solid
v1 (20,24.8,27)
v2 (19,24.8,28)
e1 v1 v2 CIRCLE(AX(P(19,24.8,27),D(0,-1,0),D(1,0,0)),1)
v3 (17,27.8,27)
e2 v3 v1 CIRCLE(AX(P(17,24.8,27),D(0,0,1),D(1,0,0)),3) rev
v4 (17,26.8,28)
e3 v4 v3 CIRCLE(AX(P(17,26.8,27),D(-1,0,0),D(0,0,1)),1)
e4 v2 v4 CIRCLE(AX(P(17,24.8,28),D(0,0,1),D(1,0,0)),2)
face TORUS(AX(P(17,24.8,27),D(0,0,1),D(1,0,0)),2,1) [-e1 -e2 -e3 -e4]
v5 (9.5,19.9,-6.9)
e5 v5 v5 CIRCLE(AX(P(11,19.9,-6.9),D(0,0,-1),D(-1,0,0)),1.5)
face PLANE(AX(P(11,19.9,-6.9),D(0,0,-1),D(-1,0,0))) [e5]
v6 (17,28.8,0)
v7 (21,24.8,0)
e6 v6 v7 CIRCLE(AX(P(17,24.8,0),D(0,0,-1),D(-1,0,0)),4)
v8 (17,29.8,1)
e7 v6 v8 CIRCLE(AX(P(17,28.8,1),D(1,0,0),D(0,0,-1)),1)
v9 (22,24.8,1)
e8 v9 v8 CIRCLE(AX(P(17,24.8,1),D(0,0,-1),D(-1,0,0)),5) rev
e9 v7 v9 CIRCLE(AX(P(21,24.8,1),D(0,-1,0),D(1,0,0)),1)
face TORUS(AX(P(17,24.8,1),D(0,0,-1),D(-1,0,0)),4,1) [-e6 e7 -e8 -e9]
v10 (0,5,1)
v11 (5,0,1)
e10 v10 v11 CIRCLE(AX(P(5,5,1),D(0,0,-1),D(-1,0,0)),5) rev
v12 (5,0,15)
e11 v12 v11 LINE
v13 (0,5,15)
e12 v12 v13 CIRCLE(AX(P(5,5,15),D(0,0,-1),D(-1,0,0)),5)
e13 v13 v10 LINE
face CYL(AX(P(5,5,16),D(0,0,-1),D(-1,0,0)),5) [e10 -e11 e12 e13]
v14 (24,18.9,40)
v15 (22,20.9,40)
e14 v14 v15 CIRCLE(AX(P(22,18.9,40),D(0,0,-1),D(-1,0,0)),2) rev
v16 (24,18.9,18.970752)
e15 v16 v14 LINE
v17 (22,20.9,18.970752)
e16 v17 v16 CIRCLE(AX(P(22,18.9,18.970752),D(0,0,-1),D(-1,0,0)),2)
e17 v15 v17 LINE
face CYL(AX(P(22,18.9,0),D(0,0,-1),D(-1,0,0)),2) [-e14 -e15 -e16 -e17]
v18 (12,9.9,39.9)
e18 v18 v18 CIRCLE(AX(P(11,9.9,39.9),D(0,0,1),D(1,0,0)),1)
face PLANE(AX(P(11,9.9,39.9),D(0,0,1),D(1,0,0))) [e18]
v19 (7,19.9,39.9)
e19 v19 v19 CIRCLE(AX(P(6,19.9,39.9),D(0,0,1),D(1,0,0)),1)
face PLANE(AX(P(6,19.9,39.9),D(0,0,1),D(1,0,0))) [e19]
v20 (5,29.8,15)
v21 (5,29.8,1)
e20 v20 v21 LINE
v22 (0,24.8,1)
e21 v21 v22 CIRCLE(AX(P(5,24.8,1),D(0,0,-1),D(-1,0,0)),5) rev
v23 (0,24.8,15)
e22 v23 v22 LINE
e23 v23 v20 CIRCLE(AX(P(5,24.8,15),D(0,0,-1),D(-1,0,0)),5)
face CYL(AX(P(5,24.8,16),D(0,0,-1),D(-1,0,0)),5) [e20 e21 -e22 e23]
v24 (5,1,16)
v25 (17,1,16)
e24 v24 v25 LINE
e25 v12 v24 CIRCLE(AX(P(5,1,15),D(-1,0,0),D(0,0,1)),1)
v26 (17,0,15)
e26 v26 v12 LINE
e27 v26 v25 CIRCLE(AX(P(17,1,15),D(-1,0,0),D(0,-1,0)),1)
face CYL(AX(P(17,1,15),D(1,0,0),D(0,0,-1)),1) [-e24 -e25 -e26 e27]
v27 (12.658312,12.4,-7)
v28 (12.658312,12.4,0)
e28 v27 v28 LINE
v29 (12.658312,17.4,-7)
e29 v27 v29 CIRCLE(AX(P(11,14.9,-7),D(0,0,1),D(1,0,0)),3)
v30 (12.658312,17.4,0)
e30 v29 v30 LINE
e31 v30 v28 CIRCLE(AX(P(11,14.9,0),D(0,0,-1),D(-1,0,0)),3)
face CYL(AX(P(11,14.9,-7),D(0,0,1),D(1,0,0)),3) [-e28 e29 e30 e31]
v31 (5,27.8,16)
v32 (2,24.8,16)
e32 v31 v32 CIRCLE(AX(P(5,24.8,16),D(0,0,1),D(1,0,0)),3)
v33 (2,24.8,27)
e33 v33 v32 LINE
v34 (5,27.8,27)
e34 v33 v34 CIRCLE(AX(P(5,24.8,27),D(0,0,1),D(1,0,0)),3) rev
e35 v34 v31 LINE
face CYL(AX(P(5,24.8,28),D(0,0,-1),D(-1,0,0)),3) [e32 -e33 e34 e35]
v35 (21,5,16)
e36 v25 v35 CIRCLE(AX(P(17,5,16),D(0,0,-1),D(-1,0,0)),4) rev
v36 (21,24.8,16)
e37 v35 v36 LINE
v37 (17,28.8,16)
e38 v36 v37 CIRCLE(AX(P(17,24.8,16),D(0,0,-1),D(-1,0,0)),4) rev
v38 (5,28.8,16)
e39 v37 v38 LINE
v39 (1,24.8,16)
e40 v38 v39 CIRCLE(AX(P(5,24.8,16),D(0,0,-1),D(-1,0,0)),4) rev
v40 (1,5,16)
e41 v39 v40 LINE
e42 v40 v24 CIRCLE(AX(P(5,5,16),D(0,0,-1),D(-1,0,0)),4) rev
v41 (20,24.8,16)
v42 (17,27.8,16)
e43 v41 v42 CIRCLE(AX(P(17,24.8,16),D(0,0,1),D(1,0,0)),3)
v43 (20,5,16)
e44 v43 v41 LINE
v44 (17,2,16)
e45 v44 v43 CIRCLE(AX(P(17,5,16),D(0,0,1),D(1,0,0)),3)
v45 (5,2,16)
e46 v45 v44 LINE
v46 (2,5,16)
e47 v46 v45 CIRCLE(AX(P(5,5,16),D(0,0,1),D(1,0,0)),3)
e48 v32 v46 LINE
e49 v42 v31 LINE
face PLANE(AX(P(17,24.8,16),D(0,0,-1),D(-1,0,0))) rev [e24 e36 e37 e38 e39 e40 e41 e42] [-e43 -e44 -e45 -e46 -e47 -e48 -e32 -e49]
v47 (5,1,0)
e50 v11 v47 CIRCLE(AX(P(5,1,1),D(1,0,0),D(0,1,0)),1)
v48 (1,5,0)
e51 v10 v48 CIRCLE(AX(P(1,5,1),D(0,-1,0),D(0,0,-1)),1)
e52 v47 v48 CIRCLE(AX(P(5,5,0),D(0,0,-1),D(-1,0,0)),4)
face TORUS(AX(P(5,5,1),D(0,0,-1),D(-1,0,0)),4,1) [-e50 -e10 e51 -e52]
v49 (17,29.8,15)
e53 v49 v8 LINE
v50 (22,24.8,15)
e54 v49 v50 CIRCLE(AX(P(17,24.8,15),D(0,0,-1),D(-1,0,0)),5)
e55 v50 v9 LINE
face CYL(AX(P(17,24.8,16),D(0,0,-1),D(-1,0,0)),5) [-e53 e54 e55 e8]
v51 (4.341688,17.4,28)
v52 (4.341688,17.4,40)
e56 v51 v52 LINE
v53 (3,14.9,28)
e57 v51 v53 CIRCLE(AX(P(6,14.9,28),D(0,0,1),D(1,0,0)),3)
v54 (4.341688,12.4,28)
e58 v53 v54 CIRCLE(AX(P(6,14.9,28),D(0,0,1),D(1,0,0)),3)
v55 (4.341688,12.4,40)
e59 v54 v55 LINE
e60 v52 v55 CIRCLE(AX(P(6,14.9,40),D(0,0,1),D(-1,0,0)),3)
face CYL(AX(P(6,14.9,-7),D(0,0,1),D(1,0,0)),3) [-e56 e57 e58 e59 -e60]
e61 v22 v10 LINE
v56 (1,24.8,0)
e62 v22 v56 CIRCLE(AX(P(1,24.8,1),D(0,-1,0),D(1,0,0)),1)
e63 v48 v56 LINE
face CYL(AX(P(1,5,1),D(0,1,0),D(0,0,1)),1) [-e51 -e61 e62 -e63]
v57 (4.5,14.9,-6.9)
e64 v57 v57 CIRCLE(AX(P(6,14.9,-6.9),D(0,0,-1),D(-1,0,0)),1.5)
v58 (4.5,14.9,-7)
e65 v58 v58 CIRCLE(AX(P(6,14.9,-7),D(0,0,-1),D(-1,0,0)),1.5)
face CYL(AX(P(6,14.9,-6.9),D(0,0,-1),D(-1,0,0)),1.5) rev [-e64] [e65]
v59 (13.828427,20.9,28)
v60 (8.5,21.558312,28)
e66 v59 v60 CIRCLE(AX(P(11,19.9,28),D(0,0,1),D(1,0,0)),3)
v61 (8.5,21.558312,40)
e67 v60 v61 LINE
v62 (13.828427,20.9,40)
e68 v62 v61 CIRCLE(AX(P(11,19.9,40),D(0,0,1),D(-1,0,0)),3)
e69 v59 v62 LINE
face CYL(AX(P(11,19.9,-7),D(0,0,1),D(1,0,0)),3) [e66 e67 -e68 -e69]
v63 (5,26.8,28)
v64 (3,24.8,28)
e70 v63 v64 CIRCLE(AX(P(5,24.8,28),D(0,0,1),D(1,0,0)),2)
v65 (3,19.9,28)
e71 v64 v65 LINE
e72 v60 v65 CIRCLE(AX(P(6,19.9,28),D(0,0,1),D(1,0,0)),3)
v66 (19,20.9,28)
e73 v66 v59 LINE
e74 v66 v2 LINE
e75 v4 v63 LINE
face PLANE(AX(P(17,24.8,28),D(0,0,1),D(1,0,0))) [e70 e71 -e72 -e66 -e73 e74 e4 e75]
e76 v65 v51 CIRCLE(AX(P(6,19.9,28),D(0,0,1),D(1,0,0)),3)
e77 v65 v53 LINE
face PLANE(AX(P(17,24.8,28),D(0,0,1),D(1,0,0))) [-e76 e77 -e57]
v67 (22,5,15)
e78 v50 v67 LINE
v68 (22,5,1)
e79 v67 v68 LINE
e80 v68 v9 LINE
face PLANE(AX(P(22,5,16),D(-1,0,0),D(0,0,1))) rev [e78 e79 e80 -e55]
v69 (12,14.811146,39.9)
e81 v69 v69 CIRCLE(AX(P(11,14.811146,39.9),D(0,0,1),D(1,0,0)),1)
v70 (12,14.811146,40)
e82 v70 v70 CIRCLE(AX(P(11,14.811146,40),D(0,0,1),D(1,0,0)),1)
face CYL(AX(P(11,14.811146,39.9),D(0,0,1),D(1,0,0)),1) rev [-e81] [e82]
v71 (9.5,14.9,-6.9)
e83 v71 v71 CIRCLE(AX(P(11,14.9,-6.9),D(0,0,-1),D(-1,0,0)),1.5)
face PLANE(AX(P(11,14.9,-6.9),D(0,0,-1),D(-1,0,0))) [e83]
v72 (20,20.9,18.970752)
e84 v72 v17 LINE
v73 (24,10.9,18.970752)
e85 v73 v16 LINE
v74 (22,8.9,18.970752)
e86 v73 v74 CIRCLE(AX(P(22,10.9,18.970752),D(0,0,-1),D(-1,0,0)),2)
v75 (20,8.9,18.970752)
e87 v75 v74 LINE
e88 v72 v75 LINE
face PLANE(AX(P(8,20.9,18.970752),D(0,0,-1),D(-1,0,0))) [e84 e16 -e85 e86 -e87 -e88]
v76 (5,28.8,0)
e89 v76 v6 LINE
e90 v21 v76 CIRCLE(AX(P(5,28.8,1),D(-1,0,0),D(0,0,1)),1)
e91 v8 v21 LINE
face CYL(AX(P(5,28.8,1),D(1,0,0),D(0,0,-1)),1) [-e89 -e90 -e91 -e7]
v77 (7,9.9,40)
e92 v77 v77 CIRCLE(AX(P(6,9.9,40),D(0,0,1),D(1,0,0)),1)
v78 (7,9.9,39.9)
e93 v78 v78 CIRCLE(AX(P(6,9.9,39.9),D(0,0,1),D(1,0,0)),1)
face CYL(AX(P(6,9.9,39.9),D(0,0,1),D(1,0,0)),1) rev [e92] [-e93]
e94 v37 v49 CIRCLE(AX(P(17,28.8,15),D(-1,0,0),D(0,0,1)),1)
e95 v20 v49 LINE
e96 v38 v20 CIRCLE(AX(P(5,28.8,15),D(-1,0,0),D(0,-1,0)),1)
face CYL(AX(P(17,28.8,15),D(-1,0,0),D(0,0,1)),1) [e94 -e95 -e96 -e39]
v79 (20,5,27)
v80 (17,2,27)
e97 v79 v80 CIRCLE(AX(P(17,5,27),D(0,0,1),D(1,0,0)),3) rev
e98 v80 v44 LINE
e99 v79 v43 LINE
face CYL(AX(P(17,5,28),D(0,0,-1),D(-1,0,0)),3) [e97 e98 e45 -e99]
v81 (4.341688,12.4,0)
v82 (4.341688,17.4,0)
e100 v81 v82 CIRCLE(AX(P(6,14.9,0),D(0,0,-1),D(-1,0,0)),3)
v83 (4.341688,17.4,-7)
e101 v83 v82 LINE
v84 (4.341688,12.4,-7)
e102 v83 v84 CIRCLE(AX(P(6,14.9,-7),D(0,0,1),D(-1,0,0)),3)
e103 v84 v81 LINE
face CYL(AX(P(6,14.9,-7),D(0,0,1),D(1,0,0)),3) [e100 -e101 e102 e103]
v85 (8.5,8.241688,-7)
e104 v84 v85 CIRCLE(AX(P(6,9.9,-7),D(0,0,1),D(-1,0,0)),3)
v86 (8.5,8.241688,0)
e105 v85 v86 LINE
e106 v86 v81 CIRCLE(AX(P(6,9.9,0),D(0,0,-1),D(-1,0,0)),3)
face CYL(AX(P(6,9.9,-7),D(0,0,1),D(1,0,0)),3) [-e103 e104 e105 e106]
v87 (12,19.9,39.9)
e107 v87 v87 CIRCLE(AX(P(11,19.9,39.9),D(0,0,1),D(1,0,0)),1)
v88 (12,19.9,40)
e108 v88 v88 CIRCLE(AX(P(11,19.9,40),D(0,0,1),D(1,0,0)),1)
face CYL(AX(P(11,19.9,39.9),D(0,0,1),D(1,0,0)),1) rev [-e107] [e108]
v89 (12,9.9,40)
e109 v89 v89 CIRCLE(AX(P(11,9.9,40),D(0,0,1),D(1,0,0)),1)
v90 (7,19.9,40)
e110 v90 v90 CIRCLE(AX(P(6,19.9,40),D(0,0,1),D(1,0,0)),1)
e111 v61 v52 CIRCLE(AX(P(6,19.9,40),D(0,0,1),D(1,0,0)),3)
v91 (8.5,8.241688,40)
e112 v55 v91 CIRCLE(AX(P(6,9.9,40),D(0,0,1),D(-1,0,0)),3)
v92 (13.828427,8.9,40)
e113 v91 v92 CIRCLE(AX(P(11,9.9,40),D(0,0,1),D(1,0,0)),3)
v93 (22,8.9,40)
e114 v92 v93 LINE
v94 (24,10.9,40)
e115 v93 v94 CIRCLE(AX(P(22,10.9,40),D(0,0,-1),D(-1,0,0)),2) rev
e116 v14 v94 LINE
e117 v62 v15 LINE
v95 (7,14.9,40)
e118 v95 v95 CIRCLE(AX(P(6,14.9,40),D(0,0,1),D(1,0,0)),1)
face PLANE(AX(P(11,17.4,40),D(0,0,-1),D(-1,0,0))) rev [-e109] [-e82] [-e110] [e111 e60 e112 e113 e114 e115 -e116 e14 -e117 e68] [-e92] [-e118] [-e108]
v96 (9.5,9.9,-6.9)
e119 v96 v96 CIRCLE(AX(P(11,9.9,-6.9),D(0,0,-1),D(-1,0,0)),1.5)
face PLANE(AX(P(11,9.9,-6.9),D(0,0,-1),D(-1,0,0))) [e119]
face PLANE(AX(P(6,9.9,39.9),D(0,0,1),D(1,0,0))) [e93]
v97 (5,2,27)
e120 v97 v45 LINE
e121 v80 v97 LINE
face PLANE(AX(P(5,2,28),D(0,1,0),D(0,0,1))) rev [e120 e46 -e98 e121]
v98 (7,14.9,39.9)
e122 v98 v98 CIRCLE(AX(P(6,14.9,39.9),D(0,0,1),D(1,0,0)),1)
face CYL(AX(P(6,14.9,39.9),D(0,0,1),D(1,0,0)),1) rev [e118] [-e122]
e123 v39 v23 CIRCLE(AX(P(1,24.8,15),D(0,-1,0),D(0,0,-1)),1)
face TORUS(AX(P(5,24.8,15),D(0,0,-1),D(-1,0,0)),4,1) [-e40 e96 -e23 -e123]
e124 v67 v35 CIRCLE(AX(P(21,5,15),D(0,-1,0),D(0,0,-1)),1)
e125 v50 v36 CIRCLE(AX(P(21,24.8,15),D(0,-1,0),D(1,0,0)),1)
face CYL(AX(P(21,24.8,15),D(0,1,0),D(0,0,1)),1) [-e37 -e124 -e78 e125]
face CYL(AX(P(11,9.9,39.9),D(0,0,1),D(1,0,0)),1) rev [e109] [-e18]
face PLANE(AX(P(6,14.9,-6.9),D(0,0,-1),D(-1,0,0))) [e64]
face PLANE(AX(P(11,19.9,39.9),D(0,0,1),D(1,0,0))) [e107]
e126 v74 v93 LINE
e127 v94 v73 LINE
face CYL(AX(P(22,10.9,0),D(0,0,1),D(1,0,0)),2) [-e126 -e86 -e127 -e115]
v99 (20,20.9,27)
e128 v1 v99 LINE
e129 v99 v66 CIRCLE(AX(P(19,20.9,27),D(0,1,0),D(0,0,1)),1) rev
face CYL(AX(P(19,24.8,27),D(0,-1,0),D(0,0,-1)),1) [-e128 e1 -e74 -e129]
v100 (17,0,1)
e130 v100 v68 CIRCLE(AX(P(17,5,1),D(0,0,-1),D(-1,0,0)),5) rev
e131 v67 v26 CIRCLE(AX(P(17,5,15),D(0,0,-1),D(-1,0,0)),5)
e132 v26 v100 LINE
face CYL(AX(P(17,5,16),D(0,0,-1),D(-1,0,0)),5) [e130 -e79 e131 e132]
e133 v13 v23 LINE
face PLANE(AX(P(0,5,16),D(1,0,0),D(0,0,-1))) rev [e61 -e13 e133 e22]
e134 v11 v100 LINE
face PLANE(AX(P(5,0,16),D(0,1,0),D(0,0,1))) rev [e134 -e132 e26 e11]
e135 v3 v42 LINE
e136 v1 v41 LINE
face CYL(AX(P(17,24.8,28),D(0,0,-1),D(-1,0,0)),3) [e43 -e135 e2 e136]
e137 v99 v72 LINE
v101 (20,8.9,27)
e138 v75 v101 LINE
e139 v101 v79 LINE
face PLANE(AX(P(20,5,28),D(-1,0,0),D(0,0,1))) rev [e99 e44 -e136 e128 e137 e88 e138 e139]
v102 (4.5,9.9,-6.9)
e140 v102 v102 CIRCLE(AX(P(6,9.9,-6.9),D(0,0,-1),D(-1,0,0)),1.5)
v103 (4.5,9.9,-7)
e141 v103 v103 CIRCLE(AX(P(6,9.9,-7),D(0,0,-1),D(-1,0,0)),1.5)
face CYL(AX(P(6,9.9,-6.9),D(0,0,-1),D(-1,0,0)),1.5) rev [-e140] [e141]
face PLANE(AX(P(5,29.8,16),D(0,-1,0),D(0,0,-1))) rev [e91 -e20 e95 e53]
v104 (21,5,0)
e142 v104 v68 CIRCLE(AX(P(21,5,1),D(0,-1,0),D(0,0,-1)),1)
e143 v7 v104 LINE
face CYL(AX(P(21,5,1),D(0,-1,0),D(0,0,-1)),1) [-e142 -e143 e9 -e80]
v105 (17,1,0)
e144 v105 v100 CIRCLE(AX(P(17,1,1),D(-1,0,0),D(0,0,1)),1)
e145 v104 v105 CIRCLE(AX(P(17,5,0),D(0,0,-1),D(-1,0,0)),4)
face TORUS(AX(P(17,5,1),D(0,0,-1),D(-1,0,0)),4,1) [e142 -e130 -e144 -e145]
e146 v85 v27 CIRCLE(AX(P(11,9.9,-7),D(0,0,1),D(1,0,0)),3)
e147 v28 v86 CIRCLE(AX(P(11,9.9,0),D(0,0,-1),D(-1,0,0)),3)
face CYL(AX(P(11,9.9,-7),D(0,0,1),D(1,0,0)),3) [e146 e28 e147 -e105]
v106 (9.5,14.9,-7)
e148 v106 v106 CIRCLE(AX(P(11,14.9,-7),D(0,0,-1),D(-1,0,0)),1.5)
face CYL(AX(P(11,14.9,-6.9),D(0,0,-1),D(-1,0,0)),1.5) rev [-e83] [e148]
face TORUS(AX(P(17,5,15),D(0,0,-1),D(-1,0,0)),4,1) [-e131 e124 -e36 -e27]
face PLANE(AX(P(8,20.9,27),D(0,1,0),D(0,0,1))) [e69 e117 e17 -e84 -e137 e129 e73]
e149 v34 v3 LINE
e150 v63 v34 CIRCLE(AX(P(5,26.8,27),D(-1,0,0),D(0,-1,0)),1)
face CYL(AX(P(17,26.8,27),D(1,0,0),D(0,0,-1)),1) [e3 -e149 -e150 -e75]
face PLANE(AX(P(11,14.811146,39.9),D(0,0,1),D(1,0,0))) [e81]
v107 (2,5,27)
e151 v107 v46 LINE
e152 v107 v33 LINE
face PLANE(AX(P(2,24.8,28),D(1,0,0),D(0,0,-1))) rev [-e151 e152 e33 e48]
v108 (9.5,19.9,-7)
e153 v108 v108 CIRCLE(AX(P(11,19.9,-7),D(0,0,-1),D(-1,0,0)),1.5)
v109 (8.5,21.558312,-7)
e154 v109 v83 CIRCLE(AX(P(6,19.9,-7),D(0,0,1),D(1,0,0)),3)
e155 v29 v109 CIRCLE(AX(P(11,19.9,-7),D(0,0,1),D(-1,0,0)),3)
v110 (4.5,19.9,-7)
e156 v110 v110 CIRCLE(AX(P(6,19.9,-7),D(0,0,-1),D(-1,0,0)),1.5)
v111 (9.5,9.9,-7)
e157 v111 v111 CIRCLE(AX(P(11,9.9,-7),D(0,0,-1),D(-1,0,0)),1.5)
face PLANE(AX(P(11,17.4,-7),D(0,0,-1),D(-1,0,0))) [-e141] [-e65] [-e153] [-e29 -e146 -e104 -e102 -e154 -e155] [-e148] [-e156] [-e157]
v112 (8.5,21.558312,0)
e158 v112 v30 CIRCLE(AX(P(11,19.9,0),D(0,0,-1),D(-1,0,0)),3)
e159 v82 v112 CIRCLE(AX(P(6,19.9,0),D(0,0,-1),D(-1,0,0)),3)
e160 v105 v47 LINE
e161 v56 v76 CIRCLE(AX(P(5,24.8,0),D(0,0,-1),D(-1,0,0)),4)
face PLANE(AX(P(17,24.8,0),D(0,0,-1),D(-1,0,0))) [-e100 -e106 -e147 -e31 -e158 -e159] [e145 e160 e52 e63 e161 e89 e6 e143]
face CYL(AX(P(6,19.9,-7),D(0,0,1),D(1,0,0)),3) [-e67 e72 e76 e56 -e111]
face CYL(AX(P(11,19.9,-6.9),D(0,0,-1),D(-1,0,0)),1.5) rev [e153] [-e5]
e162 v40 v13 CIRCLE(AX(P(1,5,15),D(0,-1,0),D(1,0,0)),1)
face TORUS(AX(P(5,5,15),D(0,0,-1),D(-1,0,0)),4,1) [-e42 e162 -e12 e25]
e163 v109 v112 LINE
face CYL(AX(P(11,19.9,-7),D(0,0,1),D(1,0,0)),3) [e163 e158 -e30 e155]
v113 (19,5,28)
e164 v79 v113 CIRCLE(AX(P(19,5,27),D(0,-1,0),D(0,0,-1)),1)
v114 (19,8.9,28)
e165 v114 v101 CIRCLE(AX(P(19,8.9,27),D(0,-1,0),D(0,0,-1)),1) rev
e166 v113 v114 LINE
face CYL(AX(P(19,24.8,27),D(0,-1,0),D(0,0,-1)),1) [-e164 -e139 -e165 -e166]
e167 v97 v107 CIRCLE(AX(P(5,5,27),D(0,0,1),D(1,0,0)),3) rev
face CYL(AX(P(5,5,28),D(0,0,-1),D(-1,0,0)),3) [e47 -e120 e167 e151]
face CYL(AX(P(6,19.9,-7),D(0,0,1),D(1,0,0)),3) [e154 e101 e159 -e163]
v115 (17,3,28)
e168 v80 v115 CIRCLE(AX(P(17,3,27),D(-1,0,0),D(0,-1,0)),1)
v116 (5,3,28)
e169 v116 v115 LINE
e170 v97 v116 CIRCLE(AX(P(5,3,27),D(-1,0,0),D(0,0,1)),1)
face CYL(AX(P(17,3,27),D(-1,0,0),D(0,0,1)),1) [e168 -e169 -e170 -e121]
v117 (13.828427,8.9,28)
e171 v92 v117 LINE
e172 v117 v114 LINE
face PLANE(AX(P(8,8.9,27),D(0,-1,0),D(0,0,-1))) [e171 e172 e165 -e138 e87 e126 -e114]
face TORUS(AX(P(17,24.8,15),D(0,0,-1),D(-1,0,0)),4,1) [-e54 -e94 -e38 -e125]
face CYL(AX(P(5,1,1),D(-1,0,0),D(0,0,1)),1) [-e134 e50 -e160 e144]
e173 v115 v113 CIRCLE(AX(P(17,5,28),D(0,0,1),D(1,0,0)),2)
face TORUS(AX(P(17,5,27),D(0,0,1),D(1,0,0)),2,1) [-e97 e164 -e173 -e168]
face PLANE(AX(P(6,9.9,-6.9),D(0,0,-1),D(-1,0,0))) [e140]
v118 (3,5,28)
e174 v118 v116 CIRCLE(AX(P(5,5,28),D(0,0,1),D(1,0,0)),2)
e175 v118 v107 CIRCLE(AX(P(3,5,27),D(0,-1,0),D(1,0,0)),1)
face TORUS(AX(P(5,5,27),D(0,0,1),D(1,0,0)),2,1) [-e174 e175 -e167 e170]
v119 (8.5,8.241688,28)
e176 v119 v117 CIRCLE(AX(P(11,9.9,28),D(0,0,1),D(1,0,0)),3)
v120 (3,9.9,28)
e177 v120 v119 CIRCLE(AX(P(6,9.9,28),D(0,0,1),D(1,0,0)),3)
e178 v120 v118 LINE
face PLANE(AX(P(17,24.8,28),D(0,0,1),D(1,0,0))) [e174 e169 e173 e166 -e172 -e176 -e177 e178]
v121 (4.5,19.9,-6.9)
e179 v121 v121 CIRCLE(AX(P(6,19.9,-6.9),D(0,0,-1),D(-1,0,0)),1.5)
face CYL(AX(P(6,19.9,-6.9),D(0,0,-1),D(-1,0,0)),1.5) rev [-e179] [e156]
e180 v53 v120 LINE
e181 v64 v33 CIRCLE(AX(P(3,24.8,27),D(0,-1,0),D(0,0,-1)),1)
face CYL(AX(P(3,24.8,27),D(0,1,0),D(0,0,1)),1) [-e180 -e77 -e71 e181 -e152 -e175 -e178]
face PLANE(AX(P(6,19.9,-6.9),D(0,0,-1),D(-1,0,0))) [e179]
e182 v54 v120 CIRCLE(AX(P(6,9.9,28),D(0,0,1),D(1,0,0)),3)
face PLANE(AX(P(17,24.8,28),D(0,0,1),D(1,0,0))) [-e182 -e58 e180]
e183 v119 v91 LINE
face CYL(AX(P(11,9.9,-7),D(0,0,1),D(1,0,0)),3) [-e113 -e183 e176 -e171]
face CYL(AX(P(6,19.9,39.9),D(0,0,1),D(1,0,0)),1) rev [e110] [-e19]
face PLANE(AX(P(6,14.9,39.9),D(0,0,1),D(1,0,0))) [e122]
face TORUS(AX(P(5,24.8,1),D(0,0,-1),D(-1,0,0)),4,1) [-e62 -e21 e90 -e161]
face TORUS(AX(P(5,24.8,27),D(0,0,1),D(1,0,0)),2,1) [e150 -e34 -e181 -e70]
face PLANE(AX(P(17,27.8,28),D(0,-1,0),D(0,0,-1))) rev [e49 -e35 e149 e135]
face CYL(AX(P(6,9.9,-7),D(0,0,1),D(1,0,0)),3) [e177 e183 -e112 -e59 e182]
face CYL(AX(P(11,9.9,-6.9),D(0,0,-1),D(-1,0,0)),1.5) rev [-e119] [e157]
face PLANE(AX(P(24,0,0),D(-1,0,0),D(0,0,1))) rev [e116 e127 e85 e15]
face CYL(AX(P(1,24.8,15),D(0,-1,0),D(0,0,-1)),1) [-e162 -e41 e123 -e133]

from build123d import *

# Parameters (mm, degrees)
EXTRUDE_1_DEPTH      = 16
EXTRUDE_2_DEPTH      = 12
EXTRUDE_3_DEPTH      = 12
EXTRUDE_3_DEPTH_BACK = 35
FILLET_1_R           = 1
EXTRUDE_4_DEPTH      = 4
EXTRUDE_4_DEPTH_BACK = 12
FILLET_2_R           = 2
SKETCH_5_R           = 1.5
CUT_EXTRUDE_1_DEPTH  = 0.1
SKETCH_6_R           = 1
CUT_EXTRUDE_2_DEPTH  = 0.1


with BuildPart() as part:
    # ｽｹｯﾁ1 → ﾎﾞｽ - 押し出し1 (new body)
    with BuildSketch(Plane.XY):
        with BuildLine():
            Line((5, 0), (17, 0))
            ThreePointArc((17, 0), (20.535533906, 1.464466094), (22, 5))
            Line((22, 5), (22, 24.8))
            ThreePointArc((22, 24.8), (20.535533906, 28.335533906), (17, 29.8))
            Line((17, 29.8), (5, 29.8))
            ThreePointArc((5, 29.8), (1.464466094, 28.335533906), (0, 24.8))
            Line((0, 24.8), (0, 5))
            ThreePointArc((0, 5), (1.464466094, 1.464466094), (5, 0))
        make_face()
    extrude(amount=EXTRUDE_1_DEPTH)

    # ｽｹｯﾁ2 → ﾎﾞｽ - 押し出し2 (add)
    with BuildSketch(Plane.XY.offset(16)):
        with BuildLine():
            Line((17, 27.8), (5, 27.8))
            ThreePointArc((5, 27.8), (2.878679656, 26.921320344), (2, 24.8))
            Line((2, 24.8), (2, 5))
            ThreePointArc((2, 5), (2.878679656, 2.878679656), (5, 2))
            Line((5, 2), (17, 2))
            ThreePointArc((17, 2), (19.121320344, 2.878679656), (20, 5))
            Line((20, 5), (20, 24.8))
            ThreePointArc((20, 24.8), (19.121320344, 26.921320344), (17, 27.8))
        make_face()
    extrude(amount=EXTRUDE_2_DEPTH)

    # ｽｹｯﾁ3 → ﾎﾞｽ - 押し出し3 (add, two sides: drawn at the far end of the back side and taken through both)
    with BuildSketch(Plane.XY.offset(28).offset(-EXTRUDE_3_DEPTH_BACK)):
        with BuildLine():
            ThreePointArc((4.341687605, 12.4), (3, 14.9), (4.341687605, 17.4))
            ThreePointArc((4.341687605, 17.4), (3.878679656, 22.021320344), (8.5, 21.558312395))
            ThreePointArc((8.5, 21.558312395), (13.121320344, 22.021320344), (12.658312395, 17.4))
            ThreePointArc((12.658312395, 17.4), (14, 14.9), (12.658312395, 12.4))
            ThreePointArc((12.658312395, 12.4), (13.121320344, 7.778679656), (8.5, 8.241687605))
            ThreePointArc((8.5, 8.241687605), (3.878679656, 7.778679656), (4.341687605, 12.4))
        make_face()
    extrude(amount=EXTRUDE_3_DEPTH + EXTRUDE_3_DEPTH_BACK)

    # ﾌｨﾚｯﾄ1
    fillet_1_edges = [part.edges().sort_by_distance(p)[0] for p in [
        (1.464466094, 28.335533906, 16),
        (11, 29.8, 0),
        (20.535533906, 28.335533906, 0),
        (0, 14.9, 16),
        (1.464466094, 1.464466094, 16),
        (11, 0, 16),
        (20.535533906, 1.464466094, 16),
        (22, 14.9, 16),
        (19.121320344, 26.921320344, 28),
        (11, 27.8, 28),
        (2.878679656, 26.921320344, 28),
        (2, 14.9, 28),
        (2.878679656, 2.878679656, 28),
        (11, 2, 28),
        (19.121320344, 2.878679656, 28),
        (20, 14.9, 28),
        (20.535533906, 28.335533906, 16),
        (11, 29.8, 16),
        (22, 14.9, 0),
        (20.535533906, 1.464466094, 0),
        (11, 0, 0),
        (1.464466094, 1.464466094, 0),
        (0, 14.9, 0),
        (1.464466094, 28.335533906, 0),
    ]]
    fillet(fillet_1_edges, radius=FILLET_1_R - 0.0001)  # a hair under: the kernel refuses the full size

    # ｽｹｯﾁ4 → ﾎﾞｽ - 押し出し4 (add, two sides: drawn at the far end of the back side and taken through both)
    with BuildSketch(Plane(origin=(20, 0, 0), x_dir=(0, 0, -1), z_dir=(1, 0, 0)).offset(-EXTRUDE_4_DEPTH_BACK)):
        Polygon((-27, 20.9), (-40, 20.9), (-40, 8.9), (-27, 8.9), (-18.970751541, 8.9), (-18.970751541, 20.9), align=None)
    extrude(amount=EXTRUDE_4_DEPTH + EXTRUDE_4_DEPTH_BACK)

    # ﾌｨﾚｯﾄ2
    fillet_2_edges = [part.edges().sort_by_distance(p)[0] for p in [
        (24, 8.9, 29.48537577),
        (24, 20.9, 29.48537577),
    ]]
    fillet(fillet_2_edges, radius=FILLET_2_R)

    # ｽｹｯﾁ5 → ｶｯﾄ - 押し出し1 (cut)
    with BuildSketch(Plane(origin=(0, 0, -7), x_dir=(-1, 0, 0), z_dir=(0, 0, -1))):
        with Locations((-11, 19.9)):
            Circle(SKETCH_5_R)
        with Locations((-11, 14.9)):
            Circle(SKETCH_5_R)
        with Locations((-11, 9.9)):
            Circle(SKETCH_5_R)
        with Locations((-6, 19.9)):
            Circle(SKETCH_5_R)
        with Locations((-6, 14.9)):
            Circle(SKETCH_5_R)
        with Locations((-6, 9.9)):
            Circle(SKETCH_5_R)
    extrude(amount=-CUT_EXTRUDE_1_DEPTH, mode=Mode.SUBTRACT)

    # ｽｹｯﾁ6 → ｶｯﾄ - 押し出し2 (cut)
    with BuildSketch(Plane.XY.offset(40)):
        with Locations((11, 19.9)):
            Circle(SKETCH_6_R)
        with Locations((11, 14.811145862)):
            Circle(SKETCH_6_R)
        with Locations((11, 9.9)):
            Circle(SKETCH_6_R)
        with Locations((6, 19.9)):
            Circle(SKETCH_6_R)
        with Locations((6, 14.9)):
            Circle(SKETCH_6_R)
        with Locations((6, 9.9)):
            Circle(SKETCH_6_R)
    extrude(amount=-CUT_EXTRUDE_2_DEPTH, mode=Mode.SUBTRACT)


solid = part.part
